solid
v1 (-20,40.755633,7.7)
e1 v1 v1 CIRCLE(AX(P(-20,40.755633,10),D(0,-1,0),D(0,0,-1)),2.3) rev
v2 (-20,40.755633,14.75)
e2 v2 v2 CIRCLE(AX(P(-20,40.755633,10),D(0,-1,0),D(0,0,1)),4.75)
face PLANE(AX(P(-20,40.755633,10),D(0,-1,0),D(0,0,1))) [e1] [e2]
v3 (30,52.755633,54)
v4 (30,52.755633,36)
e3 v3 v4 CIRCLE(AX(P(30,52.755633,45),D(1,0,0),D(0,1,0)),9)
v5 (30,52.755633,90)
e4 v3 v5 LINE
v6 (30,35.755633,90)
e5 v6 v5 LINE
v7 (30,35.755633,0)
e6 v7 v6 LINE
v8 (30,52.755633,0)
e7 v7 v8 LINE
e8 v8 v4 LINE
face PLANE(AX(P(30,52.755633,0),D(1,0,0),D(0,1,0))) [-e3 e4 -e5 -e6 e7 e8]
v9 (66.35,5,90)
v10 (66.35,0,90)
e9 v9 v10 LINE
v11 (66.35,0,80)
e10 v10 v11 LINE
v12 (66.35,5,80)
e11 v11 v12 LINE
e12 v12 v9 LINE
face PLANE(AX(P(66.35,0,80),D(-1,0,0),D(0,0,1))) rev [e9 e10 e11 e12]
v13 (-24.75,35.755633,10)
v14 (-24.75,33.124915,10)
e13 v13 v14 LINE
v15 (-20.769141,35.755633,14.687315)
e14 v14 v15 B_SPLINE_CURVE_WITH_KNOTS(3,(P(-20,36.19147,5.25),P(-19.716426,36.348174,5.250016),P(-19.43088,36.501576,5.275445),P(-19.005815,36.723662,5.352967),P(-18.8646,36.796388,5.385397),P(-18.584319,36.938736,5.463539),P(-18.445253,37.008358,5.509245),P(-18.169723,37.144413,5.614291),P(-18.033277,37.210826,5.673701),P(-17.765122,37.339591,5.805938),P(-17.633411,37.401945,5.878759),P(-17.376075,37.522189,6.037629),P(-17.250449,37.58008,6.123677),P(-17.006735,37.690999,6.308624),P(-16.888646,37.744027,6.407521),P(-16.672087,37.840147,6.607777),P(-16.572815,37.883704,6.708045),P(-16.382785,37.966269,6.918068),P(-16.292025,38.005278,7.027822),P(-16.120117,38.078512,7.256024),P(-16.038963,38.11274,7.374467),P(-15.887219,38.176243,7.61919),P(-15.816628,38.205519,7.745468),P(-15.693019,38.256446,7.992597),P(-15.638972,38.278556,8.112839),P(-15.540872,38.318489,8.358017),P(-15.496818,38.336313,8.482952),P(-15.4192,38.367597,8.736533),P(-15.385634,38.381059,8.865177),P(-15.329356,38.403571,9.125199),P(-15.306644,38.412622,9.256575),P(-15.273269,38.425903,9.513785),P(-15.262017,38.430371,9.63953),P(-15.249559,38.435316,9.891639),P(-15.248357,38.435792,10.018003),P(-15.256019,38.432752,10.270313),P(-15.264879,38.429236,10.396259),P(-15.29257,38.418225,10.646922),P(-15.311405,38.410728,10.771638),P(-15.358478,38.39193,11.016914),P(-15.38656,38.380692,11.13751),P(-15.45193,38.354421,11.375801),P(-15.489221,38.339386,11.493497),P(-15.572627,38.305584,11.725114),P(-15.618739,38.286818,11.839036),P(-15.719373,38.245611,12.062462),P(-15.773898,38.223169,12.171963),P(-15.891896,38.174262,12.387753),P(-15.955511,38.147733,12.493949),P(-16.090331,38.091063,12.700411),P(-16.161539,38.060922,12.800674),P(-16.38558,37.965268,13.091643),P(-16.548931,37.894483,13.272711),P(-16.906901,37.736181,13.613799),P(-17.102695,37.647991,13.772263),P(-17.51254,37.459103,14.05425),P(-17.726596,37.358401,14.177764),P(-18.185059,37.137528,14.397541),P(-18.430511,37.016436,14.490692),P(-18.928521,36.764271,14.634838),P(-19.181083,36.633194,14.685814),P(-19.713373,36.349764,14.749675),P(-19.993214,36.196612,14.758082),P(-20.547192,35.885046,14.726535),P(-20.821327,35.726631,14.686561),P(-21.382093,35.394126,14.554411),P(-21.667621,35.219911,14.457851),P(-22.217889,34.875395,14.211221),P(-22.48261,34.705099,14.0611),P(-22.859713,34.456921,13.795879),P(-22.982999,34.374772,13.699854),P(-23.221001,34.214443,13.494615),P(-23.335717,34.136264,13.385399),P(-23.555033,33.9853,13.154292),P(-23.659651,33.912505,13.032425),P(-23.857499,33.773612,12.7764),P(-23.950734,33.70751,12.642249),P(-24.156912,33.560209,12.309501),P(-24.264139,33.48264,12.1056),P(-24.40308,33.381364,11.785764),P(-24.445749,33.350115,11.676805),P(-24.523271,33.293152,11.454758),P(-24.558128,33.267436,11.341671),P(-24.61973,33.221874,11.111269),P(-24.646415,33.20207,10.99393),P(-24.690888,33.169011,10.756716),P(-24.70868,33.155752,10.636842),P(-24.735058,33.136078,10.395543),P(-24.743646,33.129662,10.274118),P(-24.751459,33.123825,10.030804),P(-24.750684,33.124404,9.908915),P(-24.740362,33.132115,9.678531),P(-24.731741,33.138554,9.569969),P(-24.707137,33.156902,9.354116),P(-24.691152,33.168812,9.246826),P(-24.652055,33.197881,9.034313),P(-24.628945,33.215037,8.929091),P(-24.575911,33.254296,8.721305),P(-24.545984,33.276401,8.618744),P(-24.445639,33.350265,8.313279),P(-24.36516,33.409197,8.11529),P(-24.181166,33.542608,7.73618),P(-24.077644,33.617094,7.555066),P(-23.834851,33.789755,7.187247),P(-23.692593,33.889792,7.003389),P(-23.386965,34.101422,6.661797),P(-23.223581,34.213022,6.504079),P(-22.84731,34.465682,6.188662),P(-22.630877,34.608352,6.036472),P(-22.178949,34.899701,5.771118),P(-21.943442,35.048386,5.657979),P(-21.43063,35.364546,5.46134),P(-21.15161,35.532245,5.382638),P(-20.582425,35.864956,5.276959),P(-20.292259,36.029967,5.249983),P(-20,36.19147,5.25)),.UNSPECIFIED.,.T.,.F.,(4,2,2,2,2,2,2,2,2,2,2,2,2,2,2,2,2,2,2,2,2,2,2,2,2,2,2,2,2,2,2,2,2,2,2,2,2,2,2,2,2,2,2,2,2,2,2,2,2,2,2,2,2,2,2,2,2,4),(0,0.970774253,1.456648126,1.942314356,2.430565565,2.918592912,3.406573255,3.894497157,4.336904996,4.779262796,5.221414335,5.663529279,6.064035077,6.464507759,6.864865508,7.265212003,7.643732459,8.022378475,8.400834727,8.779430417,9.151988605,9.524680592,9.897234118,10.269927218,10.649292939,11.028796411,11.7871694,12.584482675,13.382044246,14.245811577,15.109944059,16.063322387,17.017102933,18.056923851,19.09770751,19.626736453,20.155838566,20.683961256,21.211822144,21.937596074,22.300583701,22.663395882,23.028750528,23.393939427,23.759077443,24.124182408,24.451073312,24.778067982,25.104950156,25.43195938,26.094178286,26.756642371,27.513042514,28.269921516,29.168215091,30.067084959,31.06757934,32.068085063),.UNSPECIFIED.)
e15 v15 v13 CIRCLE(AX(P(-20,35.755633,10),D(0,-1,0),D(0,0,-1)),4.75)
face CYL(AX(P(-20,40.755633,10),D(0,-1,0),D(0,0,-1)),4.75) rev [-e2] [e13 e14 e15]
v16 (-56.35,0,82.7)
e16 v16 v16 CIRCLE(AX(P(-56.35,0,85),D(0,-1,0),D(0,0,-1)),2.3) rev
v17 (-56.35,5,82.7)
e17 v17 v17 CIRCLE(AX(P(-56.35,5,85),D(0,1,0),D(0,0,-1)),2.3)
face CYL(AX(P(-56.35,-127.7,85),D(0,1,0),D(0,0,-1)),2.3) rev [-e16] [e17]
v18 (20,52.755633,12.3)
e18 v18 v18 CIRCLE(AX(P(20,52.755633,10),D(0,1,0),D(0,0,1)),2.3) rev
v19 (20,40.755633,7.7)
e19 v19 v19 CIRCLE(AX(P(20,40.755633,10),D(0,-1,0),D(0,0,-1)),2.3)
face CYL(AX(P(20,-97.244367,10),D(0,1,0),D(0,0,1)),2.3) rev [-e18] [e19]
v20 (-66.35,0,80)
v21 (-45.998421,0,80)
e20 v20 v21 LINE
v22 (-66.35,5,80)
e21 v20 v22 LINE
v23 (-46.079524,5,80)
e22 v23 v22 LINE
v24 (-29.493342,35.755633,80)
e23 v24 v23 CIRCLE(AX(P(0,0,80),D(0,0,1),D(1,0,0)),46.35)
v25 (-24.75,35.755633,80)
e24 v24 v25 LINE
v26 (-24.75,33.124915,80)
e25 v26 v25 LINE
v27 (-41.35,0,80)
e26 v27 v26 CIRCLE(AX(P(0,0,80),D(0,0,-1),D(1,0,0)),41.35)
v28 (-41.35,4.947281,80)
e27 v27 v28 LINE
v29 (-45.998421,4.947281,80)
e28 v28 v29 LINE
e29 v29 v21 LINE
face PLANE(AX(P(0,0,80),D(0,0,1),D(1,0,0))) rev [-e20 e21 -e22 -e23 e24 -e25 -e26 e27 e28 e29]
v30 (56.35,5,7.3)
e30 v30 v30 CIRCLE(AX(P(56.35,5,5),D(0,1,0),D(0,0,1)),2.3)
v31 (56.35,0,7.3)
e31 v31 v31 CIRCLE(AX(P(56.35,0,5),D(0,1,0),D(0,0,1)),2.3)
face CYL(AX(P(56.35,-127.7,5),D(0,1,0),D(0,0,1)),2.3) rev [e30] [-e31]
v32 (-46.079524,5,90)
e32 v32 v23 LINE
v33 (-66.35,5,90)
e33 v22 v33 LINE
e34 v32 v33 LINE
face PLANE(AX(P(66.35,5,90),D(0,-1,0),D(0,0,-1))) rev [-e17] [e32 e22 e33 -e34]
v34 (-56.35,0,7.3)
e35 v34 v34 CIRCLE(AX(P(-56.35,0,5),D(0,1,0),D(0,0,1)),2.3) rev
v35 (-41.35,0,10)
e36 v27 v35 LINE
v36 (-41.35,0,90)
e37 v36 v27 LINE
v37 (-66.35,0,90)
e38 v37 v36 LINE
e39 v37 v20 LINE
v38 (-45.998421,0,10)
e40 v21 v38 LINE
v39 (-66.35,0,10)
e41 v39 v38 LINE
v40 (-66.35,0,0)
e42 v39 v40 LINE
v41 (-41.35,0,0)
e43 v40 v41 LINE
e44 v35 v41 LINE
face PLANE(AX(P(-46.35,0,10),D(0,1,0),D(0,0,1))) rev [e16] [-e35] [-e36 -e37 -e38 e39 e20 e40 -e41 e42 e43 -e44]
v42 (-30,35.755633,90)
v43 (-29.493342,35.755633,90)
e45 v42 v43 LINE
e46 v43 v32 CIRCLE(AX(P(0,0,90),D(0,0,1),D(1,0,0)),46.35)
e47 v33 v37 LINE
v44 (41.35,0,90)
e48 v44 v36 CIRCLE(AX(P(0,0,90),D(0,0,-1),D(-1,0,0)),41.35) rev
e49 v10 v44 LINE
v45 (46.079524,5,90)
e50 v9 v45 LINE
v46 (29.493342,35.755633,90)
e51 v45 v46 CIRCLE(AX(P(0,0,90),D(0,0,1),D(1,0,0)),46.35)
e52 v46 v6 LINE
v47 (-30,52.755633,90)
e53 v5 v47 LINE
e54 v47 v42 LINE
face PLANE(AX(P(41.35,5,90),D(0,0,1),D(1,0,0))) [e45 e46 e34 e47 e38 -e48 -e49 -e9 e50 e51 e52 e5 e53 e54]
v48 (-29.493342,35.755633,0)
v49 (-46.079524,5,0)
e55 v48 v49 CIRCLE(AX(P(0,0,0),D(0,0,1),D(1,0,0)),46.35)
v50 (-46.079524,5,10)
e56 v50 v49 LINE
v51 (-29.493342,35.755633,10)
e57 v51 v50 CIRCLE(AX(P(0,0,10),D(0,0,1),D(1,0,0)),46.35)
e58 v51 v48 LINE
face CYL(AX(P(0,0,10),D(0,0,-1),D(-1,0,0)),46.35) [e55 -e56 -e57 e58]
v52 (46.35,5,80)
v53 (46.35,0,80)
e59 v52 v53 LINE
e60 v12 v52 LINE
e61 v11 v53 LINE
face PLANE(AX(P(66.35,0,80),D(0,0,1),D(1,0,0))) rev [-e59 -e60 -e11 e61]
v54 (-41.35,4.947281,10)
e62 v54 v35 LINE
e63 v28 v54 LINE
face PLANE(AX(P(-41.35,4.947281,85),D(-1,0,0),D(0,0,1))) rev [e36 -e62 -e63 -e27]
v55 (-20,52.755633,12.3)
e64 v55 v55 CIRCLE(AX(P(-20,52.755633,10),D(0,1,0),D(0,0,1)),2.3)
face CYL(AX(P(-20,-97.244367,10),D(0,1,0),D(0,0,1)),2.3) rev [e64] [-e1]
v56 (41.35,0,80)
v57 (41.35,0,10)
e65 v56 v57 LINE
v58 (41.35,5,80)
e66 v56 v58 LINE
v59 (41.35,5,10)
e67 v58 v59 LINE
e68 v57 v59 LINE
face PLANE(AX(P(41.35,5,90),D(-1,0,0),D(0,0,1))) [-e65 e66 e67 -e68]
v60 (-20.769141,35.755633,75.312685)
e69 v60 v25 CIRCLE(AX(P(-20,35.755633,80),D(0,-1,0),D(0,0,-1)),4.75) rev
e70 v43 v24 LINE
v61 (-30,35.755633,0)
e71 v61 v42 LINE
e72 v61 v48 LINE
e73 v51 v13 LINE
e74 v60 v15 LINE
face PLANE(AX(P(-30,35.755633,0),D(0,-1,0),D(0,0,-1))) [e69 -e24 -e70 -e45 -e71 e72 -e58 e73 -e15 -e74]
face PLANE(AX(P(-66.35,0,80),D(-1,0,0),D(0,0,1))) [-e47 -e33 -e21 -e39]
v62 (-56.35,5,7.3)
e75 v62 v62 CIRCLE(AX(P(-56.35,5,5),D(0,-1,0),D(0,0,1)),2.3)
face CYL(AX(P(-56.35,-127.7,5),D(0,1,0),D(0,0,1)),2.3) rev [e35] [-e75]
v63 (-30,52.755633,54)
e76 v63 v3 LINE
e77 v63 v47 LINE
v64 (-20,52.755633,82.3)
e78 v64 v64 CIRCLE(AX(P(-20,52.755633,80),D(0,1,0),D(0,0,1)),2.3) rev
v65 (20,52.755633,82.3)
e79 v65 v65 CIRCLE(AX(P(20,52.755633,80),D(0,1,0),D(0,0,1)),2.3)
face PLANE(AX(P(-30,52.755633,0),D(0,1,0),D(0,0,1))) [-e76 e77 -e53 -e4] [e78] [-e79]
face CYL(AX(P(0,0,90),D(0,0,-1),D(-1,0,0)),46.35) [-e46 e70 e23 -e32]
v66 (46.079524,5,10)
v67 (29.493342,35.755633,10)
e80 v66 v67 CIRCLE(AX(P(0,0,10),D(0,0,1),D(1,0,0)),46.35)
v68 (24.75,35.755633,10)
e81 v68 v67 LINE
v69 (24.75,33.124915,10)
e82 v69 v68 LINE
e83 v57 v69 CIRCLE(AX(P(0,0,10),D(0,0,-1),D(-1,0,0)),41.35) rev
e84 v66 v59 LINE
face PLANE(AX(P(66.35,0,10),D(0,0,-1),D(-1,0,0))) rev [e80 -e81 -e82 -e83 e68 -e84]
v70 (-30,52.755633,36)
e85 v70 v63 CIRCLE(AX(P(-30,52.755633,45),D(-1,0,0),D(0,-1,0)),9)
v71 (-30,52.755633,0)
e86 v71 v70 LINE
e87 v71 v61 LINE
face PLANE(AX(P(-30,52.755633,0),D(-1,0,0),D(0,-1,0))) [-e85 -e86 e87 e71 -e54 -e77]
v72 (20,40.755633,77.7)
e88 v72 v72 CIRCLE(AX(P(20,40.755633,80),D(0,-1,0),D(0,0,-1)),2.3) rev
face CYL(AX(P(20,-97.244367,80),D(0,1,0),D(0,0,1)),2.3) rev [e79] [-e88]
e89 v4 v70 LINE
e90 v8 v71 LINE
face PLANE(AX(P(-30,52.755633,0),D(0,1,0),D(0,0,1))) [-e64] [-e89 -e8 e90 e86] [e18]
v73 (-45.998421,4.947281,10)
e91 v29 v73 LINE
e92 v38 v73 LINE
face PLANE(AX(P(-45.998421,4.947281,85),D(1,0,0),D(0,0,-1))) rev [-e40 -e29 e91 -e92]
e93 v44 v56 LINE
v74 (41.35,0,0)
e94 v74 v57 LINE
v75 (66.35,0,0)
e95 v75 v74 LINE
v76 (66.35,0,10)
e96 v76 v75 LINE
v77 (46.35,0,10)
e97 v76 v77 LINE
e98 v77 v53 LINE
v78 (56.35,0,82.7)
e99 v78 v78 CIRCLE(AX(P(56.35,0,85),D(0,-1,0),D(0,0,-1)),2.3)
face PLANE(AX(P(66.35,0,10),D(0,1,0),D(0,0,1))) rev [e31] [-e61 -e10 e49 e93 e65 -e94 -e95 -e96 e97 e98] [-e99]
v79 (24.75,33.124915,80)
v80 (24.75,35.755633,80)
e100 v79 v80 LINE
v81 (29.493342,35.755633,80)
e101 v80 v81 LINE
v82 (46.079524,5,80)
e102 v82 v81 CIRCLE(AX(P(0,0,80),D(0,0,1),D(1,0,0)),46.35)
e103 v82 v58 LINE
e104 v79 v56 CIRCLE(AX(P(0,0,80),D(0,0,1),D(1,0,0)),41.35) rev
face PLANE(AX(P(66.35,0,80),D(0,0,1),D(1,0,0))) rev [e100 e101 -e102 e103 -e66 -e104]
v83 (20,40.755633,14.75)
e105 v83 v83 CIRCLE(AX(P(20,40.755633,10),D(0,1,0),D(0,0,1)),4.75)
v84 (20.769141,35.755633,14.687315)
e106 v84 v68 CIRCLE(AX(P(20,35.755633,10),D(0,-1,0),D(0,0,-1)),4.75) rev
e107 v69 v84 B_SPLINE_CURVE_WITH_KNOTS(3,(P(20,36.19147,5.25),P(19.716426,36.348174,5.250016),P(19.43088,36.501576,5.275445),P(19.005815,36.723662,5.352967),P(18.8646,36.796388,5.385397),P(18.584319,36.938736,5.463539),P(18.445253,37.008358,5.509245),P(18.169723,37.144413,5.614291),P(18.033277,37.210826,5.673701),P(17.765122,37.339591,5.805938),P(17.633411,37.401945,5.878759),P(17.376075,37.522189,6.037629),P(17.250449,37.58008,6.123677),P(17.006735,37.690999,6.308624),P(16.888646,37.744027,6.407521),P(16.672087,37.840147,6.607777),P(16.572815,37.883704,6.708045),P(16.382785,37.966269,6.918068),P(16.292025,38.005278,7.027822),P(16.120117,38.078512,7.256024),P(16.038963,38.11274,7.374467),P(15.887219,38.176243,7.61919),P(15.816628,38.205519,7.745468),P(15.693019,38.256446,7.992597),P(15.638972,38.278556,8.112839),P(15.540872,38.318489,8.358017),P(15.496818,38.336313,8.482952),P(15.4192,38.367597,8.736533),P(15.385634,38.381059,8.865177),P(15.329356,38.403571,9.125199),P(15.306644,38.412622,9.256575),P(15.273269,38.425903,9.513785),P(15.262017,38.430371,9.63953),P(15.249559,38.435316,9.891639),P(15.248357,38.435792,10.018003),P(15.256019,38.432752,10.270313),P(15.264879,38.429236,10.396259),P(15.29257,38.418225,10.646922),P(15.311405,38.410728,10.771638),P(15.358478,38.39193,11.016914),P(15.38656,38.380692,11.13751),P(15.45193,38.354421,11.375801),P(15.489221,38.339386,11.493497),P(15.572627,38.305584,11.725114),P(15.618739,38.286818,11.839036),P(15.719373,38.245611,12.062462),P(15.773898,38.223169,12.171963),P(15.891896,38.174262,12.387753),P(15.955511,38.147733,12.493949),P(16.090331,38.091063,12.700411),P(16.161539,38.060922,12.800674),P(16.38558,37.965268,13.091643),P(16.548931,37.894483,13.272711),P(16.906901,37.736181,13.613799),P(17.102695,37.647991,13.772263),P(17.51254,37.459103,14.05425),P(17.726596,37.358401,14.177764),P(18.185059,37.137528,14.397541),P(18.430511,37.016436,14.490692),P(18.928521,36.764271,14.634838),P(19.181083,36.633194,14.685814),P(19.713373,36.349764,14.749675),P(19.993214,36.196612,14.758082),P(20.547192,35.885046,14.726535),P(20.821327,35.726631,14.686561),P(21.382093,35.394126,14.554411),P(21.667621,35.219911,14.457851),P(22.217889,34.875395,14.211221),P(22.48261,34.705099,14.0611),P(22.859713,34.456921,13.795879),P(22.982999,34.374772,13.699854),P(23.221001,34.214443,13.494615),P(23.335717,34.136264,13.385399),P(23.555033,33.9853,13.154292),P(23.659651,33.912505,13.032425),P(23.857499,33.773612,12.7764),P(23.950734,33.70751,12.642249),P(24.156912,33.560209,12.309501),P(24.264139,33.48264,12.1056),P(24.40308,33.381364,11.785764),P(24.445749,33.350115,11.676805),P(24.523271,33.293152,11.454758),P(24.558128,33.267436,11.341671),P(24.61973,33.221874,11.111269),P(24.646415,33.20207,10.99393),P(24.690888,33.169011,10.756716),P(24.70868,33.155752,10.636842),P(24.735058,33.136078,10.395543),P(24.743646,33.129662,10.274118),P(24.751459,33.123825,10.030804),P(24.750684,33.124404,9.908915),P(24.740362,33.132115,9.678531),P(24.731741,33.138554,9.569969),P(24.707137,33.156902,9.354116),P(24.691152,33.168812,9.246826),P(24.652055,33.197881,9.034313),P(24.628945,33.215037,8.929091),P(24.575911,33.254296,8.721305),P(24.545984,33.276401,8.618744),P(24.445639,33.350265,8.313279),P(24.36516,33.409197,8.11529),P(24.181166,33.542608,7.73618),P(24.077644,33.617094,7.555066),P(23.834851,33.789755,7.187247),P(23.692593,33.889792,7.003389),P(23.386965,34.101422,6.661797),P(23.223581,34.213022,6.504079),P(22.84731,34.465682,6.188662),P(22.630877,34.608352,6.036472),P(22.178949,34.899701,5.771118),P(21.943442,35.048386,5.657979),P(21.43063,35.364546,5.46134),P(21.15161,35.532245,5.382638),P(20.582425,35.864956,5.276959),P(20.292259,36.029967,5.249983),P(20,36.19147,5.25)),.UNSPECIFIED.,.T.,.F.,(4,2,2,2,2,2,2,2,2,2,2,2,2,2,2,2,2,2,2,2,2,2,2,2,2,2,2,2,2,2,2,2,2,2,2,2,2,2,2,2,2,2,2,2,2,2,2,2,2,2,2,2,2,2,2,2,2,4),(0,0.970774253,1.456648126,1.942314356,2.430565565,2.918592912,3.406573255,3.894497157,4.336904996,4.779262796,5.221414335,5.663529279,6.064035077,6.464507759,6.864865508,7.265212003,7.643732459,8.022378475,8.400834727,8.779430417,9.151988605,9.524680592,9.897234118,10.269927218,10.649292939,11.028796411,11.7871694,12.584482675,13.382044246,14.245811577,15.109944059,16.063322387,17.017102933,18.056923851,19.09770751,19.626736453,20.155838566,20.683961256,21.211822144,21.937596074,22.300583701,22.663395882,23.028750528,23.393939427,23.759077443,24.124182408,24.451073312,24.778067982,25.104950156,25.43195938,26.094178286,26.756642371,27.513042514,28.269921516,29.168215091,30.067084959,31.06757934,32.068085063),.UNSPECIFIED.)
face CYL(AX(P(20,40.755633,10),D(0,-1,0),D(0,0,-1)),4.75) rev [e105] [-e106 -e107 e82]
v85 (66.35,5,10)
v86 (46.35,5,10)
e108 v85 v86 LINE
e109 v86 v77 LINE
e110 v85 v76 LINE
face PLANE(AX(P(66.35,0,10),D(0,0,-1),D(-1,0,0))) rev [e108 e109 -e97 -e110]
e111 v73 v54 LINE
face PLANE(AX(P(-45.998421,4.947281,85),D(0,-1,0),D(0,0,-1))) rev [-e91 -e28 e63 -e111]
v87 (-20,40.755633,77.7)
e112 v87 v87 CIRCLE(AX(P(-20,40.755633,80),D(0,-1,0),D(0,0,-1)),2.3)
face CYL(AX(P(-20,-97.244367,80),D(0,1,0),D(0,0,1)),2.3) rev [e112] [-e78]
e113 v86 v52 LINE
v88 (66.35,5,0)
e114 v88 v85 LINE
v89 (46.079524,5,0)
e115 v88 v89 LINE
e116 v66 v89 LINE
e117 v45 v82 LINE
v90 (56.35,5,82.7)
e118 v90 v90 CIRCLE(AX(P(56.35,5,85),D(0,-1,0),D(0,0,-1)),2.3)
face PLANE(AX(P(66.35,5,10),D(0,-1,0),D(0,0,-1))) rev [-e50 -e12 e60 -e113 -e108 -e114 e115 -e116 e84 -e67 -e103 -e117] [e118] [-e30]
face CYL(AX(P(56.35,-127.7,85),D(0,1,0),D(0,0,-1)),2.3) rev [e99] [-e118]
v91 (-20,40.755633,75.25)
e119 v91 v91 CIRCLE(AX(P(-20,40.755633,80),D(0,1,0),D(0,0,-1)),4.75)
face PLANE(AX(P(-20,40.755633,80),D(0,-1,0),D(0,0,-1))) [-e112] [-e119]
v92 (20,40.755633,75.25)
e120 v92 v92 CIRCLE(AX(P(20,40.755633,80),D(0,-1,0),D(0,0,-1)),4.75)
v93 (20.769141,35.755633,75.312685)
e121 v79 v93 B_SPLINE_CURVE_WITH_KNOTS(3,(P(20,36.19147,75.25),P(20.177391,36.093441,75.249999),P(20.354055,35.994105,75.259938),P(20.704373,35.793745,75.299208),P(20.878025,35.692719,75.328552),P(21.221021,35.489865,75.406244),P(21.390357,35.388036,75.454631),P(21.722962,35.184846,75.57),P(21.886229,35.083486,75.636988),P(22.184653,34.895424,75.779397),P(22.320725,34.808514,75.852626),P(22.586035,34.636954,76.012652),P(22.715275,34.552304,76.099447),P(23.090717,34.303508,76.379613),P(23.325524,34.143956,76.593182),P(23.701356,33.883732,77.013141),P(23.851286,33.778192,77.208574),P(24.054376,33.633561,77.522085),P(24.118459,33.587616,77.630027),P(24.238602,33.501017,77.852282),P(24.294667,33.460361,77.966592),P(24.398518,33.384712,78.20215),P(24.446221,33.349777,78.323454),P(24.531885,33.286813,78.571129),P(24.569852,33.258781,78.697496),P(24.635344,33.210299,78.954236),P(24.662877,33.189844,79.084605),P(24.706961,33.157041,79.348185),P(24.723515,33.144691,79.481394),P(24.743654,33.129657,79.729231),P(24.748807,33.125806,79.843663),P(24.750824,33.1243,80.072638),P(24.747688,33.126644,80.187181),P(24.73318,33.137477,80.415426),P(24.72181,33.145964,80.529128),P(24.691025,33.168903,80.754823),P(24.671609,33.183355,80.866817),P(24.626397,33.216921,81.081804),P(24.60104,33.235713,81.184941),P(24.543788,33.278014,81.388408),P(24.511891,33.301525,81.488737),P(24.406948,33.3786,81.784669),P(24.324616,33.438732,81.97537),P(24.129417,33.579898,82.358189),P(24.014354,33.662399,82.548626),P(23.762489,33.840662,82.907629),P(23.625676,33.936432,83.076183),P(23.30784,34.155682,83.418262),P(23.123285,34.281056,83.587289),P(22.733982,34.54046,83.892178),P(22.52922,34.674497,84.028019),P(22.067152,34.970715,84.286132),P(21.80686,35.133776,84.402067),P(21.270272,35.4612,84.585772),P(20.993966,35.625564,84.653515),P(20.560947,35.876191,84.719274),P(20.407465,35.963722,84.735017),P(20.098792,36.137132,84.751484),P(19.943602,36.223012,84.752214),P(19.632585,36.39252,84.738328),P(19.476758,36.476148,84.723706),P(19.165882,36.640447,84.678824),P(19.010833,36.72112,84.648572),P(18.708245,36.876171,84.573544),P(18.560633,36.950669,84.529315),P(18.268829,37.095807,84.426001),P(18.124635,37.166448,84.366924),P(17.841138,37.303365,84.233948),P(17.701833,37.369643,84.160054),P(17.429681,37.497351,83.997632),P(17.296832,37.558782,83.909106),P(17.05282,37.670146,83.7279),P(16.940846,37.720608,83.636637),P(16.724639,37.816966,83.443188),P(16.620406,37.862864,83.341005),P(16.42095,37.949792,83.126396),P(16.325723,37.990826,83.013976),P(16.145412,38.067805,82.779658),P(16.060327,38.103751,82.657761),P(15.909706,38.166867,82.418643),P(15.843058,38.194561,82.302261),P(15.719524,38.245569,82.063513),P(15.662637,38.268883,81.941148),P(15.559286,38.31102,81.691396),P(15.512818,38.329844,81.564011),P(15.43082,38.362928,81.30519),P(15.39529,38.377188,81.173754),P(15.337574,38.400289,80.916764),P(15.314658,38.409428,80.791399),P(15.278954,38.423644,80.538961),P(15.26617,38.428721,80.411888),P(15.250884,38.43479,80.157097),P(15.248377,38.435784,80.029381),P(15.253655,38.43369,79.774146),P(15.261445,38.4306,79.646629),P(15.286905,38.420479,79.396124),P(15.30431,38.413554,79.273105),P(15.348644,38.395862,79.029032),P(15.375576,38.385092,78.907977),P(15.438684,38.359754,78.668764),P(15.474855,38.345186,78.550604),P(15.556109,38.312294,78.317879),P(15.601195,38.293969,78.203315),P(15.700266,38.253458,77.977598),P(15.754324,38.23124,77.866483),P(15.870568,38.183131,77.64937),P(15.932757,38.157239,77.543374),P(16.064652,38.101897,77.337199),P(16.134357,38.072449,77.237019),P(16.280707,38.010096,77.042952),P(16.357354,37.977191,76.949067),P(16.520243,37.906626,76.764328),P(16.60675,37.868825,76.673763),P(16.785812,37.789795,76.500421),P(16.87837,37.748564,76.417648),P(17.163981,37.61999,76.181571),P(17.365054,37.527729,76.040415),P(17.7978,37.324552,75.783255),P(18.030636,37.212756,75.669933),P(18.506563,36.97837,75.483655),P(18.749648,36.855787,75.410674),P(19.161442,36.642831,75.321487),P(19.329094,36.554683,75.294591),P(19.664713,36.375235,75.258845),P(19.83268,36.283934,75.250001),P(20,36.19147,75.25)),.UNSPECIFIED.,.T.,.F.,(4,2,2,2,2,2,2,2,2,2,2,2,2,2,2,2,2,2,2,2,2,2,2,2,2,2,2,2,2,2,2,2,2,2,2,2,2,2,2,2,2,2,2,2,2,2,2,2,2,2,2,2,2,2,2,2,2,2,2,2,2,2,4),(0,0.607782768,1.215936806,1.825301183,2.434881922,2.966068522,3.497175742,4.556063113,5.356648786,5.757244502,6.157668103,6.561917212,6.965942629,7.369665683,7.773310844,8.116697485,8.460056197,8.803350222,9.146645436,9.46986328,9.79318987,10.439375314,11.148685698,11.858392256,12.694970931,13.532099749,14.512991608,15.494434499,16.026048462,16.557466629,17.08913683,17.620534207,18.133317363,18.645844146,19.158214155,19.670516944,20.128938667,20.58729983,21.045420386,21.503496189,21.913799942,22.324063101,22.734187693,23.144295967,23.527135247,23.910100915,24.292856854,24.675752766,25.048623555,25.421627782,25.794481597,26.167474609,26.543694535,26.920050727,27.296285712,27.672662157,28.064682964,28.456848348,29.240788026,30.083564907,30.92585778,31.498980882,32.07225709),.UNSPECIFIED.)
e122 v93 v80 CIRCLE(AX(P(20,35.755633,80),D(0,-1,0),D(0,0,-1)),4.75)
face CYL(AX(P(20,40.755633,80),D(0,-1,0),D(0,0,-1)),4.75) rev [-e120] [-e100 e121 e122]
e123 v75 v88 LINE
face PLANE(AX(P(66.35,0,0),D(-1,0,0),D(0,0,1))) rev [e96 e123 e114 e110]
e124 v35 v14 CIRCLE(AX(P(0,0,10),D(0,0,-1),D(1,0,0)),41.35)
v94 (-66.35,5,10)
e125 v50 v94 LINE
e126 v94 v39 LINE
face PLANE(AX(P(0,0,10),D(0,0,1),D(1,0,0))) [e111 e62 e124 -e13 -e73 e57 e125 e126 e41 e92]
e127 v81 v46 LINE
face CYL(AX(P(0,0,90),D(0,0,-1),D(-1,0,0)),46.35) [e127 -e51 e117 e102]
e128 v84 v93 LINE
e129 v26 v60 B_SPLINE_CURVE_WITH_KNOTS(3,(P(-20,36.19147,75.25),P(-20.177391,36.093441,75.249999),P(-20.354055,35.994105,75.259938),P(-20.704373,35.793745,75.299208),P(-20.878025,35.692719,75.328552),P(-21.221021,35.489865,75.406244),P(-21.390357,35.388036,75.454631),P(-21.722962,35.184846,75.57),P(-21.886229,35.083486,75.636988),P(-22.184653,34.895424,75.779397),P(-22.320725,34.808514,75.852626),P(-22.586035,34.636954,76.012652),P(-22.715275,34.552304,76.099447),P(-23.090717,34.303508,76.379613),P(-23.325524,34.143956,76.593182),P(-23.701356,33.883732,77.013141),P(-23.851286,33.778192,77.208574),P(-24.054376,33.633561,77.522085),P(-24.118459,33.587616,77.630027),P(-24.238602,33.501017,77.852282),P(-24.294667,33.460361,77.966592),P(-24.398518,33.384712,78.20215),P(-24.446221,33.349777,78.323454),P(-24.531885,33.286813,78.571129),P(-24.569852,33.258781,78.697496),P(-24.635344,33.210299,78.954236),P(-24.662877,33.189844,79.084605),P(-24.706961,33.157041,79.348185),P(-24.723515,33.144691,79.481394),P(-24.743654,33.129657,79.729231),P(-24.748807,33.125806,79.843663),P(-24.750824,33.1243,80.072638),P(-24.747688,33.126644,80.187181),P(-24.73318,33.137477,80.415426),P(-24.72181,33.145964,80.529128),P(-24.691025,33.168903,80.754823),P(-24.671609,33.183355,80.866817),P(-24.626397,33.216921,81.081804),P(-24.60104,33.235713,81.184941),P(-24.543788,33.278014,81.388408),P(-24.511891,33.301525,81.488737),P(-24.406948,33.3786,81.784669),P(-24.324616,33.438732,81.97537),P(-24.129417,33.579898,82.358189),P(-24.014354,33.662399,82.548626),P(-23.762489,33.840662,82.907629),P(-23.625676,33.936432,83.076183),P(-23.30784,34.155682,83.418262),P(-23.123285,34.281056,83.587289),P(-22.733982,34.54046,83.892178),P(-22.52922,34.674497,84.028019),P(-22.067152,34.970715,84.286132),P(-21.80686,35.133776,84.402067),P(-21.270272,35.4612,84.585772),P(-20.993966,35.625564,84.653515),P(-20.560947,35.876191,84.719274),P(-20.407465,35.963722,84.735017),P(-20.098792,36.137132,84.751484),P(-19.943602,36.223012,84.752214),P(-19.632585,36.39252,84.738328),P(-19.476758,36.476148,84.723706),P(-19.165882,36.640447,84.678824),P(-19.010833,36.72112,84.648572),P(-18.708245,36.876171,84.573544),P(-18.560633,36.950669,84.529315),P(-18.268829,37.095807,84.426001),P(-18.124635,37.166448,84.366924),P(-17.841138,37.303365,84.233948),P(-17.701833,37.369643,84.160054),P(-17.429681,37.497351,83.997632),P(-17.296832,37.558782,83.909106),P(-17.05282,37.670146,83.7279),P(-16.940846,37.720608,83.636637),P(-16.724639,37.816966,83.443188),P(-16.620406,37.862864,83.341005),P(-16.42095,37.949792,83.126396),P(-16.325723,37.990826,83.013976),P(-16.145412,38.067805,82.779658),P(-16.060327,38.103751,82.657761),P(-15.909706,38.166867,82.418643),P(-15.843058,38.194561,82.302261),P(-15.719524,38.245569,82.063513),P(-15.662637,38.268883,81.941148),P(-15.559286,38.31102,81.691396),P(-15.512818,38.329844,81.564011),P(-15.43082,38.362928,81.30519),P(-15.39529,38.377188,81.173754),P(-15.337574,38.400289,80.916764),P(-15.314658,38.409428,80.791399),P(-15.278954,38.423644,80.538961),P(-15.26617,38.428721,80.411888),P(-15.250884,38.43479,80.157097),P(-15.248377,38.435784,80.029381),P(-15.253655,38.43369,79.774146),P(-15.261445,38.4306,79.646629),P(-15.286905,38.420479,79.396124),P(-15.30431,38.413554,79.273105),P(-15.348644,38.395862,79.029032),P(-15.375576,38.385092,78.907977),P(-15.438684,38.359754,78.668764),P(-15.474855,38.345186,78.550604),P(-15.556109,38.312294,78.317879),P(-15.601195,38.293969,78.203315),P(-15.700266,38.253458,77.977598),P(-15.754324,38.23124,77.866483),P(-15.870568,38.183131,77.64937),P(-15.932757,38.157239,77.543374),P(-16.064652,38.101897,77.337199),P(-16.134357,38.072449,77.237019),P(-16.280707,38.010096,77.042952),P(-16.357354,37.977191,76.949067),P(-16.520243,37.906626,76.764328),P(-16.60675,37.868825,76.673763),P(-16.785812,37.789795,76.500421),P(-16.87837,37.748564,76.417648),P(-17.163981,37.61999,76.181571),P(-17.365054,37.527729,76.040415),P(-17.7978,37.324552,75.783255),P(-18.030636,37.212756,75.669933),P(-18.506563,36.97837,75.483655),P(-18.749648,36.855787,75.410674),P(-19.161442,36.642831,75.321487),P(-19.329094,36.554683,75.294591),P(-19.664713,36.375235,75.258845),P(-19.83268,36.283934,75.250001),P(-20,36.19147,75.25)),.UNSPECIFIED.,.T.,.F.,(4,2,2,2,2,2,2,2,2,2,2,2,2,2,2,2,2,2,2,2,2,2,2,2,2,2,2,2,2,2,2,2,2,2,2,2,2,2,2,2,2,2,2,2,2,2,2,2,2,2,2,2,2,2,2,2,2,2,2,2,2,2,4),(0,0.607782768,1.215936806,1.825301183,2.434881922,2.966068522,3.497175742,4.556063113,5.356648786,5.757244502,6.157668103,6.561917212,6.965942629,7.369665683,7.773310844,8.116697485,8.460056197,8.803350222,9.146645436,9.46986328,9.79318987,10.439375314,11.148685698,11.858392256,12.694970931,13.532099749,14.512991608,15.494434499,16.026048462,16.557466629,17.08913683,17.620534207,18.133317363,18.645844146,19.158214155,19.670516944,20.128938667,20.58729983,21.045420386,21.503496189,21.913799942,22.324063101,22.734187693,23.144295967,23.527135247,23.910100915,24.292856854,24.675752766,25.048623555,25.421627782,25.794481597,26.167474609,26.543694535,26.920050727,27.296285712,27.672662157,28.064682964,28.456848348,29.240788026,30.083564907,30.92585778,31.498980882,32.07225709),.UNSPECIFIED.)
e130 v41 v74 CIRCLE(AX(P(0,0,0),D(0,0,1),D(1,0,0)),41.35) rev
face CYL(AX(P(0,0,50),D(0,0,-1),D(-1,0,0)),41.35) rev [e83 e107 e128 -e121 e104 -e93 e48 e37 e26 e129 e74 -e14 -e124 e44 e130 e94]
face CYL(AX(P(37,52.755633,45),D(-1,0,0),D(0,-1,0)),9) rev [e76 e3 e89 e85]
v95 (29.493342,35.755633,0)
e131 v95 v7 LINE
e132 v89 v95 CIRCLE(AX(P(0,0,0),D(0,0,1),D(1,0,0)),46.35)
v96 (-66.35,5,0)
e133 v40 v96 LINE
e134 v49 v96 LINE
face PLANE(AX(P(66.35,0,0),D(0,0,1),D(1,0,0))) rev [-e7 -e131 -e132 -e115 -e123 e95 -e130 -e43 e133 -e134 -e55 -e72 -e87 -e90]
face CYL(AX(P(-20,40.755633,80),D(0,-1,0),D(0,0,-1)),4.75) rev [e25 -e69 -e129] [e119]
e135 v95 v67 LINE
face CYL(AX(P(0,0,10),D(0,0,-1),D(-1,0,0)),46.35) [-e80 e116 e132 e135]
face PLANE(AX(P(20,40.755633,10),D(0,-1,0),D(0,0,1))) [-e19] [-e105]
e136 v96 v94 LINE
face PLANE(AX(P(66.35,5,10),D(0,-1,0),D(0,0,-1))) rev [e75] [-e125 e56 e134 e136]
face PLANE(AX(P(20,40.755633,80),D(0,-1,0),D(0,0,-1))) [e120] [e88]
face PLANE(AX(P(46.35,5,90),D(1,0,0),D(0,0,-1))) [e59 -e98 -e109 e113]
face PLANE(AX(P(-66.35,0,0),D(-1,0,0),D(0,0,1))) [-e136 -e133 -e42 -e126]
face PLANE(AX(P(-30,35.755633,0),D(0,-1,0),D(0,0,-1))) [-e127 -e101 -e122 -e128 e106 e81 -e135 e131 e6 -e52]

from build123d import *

# Parameters (mm, degrees)
BOSS_EXTRUDE1_DEPTH      = 10
SKETCH2_W                = 10
SKETCH2_H                = 5
BOSS_EXTRUDE2_DEPTH      = 66.35
SKETCH3_R                = 2.3
CUT_EXTRUDE1_DEPTH       = 132.7
SKETCH4_R                = 41.35
CUT_EXTRUDE3_DEPTH       = 50
LPATTERN4_START          = 80
LPATTERN4_DEPTH          = 10
LPATTERN4_2_DEPTH        = 10
LPATTERN4_3_DEPTH        = 10
MIRROR5_COPY_1_SKETCH_R  = 2.3
MIRROR5_COPY_1_DEPTH     = 132.7
SKETCH8_W                = 4.648420871
SKETCH8_H                = 4.94728133
BOSS_EXTRUDE3_DEPTH      = 40
SKETCH11_W               = 60
SKETCH11_H               = 17
BOSS_EXTRUDE4_DEPTH      = 90
SKETCH12_R               = 41.35
CUT_EXTRUDE4_DEPTH       = 250
SKETCH14_R               = 2.3
CUT_EXTRUDE6_DEPTH       = 150
MIRROR8_COPY_1_SKETCH_R  = 2.3
MIRROR8_COPY_1_DEPTH     = 150
SKETCH15_R               = 9
CUT_EXTRUDE7_DEPTH       = 67
SKETCH16_W               = 5
SKETCH16_H               = 90
BOSS_EXTRUDE5_DEPTH      = 5
SKETCH18_R               = 4.75
CUT_EXTRUDE8_DEPTH       = 5
MIRROR10_COPY_1_SKETCH_R = 4.75
MIRROR10_COPY_1_DEPTH    = 5


# Read off the part's stored shape, not the designer's step: LPattern4
with BuildPart() as part:
    # Sketch1 → Boss-Extrude1 (new body)
    with BuildSketch(Plane.XY):
        with BuildLine():
            Line((-46.35, 0), (-41.35, 0))
            ThreePointArc((-41.35, 0), (0, 41.35), (41.35, 0))
            Line((41.35, 0), (46.35, 0))
            ThreePointArc((46.35, 0), (0, 46.35), (-46.35, 0))
        make_face()
    extrude(amount=BOSS_EXTRUDE1_DEPTH)



with BuildPart() as body_2:
    # Sketch2 → Boss-Extrude2 (new, symmetric)
    with BuildSketch(Plane(origin=(0, 0, 0), x_dir=(0, 0, -1), z_dir=(1, 0, 0))):
        with Locations((-5, 2.5)):
            Rectangle(SKETCH2_W, SKETCH2_H)
    extrude(amount=BOSS_EXTRUDE2_DEPTH, both=True)

    # Sketch3 → Cut-Extrude1 (cut)
    with BuildSketch(Plane(origin=(0, 5, 0), x_dir=(1, 0, 0), z_dir=(0, 1, 0))):
        with Locations(Location((56.35, -5, 0), (0, 0, 270))):
            Circle(SKETCH3_R)
    cut_extrude1 = extrude(amount=-CUT_EXTRUDE1_DEPTH, mode=Mode.SUBTRACT)

    # Mirror1: Cut-Extrude1 across plane
    add(cut_extrude1.mirror(Plane(origin=(0, 0, 0), x_dir=(0, 0, 1), z_dir=(1, 0, 0))), mode=Mode.SUBTRACT)

    # Sketch4 → Cut-Extrude3 (cut, symmetric)
    with BuildSketch(Plane.XY):
        Circle(SKETCH4_R)
    extrude(amount=CUT_EXTRUDE3_DEPTH, both=True, mode=Mode.SUBTRACT)


with BuildPart() as cut_extrude3_piece_1:
    # of the separate pieces the step leaves, piece 1, a body of its own (cut_extrude3_pieces)
    add(body_2.part.solids().sort_by_distance((-41.35, 0, 10))[0])


with BuildPart() as cut_extrude3_piece_2:
    # of the separate pieces the step leaves, piece 2, a body of its own (cut_extrude3_pieces)
    add(body_2.part.solids().sort_by_distance((66.35, 0, 10))[0])


with BuildPart() as body_4:
    # LPattern4 outline → LPattern4 (new body)
    with BuildSketch(Plane.XY.offset(LPATTERN4_START)):
        with BuildLine():
            Line((66.35, 0), (66.35, 5))
            Line((66.35, 5), (41.046589383, 5))
            ThreePointArc((41.046589383, 5), (41.274077646, 2.504598671), (41.35, 0))
            Line((41.35, 0), (66.35, 0))
        make_face()
    extrude(amount=LPATTERN4_DEPTH)

    # Mirror5: Cut-Extrude1 across plane
    add(cut_extrude1.mirror(Plane.XY.offset(45)), mode=Mode.SUBTRACT)


with BuildPart() as body_5:
    # LPattern4 2 outline → LPattern4 2 (new body)
    with BuildSketch(Plane.XY.offset(LPATTERN4_START)):
        with BuildLine():
            Line((-46.35, 0), (-41.35, 0))
            ThreePointArc((-41.35, 0), (0, 41.35), (41.35, 0))
            Line((41.35, 0), (46.35, 0))
            ThreePointArc((46.35, 0), (0, 46.35), (-46.35, 0))
        make_face()
    extrude(amount=LPATTERN4_2_DEPTH)


with BuildPart() as body_6:
    # LPattern4 3 outline → LPattern4 3 (new body)
    with BuildSketch(Plane.XY.offset(LPATTERN4_START)):
        with BuildLine():
            Line((-66.35, 0), (-41.35, 0))
            ThreePointArc((-41.35, 0), (-41.274077646, 2.504598671), (-41.046589383, 5))
            Line((-41.046589383, 5), (-66.35, 5))
            Line((-66.35, 5), (-66.35, 0))
        make_face()
    extrude(amount=LPATTERN4_3_DEPTH)

    # Mirror5 copy 1 sketch → Mirror5 copy 1 (cut)
    with BuildSketch(Plane(origin=(0, 5, 90), x_dir=(-1, 0, 0), z_dir=(0, 1, 0))):
        with Locations(Location((56.35, -5, 0), (0, 0, 270))):
            Circle(MIRROR5_COPY_1_SKETCH_R)
    extrude(amount=-MIRROR5_COPY_1_DEPTH, mode=Mode.SUBTRACT)


with BuildPart() as part_1:
    add(part.part)

    add(cut_extrude3_piece_1.part)  # Boss-Extrude3 merges Cut-Extrude3 piece 1

    add(body_5.part)  # Boss-Extrude3 merges body 5

    add(body_6.part)  # Boss-Extrude3 merges body 6
    # Sketch8 → Boss-Extrude3 (add, symmetric)
    with BuildSketch(Plane.XY.offset(45)):
        with Locations((-43.674210436, 2.473640665)):
            Rectangle(SKETCH8_W, SKETCH8_H)
    boss_extrude3 = extrude(amount=BOSS_EXTRUDE3_DEPTH, both=True)

    # Mirror6: Boss-Extrude3 across plane
    add(boss_extrude3.mirror(Plane(origin=(0, 0, 0), x_dir=(0, 0, 1), z_dir=(1, 0, 0))))

    # Sketch11 → Boss-Extrude4 (add)
    with BuildSketch(Plane.XY.offset(90)):
        with Locations((0, 44.255632839)):
            Rectangle(SKETCH11_W, SKETCH11_H)
    extrude(amount=-BOSS_EXTRUDE4_DEPTH)

    # Sketch12 → Cut-Extrude4 (cut, symmetric)
    with BuildSketch(Plane.XY.offset(90)):
        Circle(SKETCH12_R)
    extrude(amount=CUT_EXTRUDE4_DEPTH, both=True, mode=Mode.SUBTRACT)

    # Sketch14 → Cut-Extrude6 (cut, symmetric)
    with BuildSketch(Plane(origin=(0, 52.755632839, 0), x_dir=(1, 0, 0), z_dir=(0, 1, 0))):
        with Locations(Location((20, -80, 0), (0, 0, 270))):
            Circle(SKETCH14_R)
    cut_extrude6 = extrude(amount=CUT_EXTRUDE6_DEPTH, both=True, mode=Mode.SUBTRACT)

    # Mirror7: Cut-Extrude6 across plane
    add(cut_extrude6.mirror(Plane(origin=(0, 0, 0), x_dir=(0, 0, 1), z_dir=(1, 0, 0))), mode=Mode.SUBTRACT)

    # Mirror8: Cut-Extrude6 across plane
    add(cut_extrude6.mirror(Plane.XY.offset(45)), mode=Mode.SUBTRACT)

    # Mirror8 copy 1 sketch → Mirror8 copy 1 (cut, symmetric)
    with BuildSketch(Plane(origin=(0, 52.755632839, 90), x_dir=(-1, 0, 0), z_dir=(0, 1, 0))):
        with Locations(Location((20, -80, 0), (0, 0, 270))):
            Circle(MIRROR8_COPY_1_SKETCH_R)
    extrude(amount=MIRROR8_COPY_1_DEPTH, both=True, mode=Mode.SUBTRACT)

    # Sketch15 → Cut-Extrude7 (cut)
    with BuildSketch(Plane.ZY.offset(30)):
        with Locations((45, 52.755632839)):
            Circle(SKETCH15_R)
    extrude(amount=-CUT_EXTRUDE7_DEPTH, mode=Mode.SUBTRACT)


    add(cut_extrude3_piece_2.part)  # Boss-Extrude5 merges Cut-Extrude3 piece 2

    add(body_4.part)  # Boss-Extrude5 merges body 4
    # Sketch16 → Boss-Extrude5 (add)
    with BuildSketch(Plane.XZ):
        with Locations((43.85, 45)):
            Rectangle(SKETCH16_W, SKETCH16_H)
    extrude(amount=-BOSS_EXTRUDE5_DEPTH)

    # Sketch18 → Cut-Extrude8 (cut, symmetric)
    with BuildSketch(Plane.XZ.offset(-35.755632839)):
        with Locations(Location((20, 80, 0), (0, 0, 270))):
            Circle(SKETCH18_R)
    cut_extrude8 = extrude(amount=CUT_EXTRUDE8_DEPTH, both=True, mode=Mode.SUBTRACT)

    # Mirror9: Cut-Extrude8 across plane
    add(cut_extrude8.mirror(Plane.XY.offset(45)), mode=Mode.SUBTRACT)

    # Mirror10: Cut-Extrude8 across plane
    add(cut_extrude8.mirror(Plane(origin=(0, 0, 0), x_dir=(0, 0, 1), z_dir=(1, 0, 0))), mode=Mode.SUBTRACT)

    # Mirror10 copy 1 sketch → Mirror10 copy 1 (cut, symmetric)
    with BuildSketch(Plane(origin=(0, 35.755632839, 90), x_dir=(-1, 0, 0), z_dir=(0, -1, 0))):
        with Locations(Location((20, 80, 0), (0, 0, 270))):
            Circle(MIRROR10_COPY_1_SKETCH_R)
    extrude(amount=MIRROR10_COPY_1_DEPTH, both=True, mode=Mode.SUBTRACT)


solid = part_1.part
